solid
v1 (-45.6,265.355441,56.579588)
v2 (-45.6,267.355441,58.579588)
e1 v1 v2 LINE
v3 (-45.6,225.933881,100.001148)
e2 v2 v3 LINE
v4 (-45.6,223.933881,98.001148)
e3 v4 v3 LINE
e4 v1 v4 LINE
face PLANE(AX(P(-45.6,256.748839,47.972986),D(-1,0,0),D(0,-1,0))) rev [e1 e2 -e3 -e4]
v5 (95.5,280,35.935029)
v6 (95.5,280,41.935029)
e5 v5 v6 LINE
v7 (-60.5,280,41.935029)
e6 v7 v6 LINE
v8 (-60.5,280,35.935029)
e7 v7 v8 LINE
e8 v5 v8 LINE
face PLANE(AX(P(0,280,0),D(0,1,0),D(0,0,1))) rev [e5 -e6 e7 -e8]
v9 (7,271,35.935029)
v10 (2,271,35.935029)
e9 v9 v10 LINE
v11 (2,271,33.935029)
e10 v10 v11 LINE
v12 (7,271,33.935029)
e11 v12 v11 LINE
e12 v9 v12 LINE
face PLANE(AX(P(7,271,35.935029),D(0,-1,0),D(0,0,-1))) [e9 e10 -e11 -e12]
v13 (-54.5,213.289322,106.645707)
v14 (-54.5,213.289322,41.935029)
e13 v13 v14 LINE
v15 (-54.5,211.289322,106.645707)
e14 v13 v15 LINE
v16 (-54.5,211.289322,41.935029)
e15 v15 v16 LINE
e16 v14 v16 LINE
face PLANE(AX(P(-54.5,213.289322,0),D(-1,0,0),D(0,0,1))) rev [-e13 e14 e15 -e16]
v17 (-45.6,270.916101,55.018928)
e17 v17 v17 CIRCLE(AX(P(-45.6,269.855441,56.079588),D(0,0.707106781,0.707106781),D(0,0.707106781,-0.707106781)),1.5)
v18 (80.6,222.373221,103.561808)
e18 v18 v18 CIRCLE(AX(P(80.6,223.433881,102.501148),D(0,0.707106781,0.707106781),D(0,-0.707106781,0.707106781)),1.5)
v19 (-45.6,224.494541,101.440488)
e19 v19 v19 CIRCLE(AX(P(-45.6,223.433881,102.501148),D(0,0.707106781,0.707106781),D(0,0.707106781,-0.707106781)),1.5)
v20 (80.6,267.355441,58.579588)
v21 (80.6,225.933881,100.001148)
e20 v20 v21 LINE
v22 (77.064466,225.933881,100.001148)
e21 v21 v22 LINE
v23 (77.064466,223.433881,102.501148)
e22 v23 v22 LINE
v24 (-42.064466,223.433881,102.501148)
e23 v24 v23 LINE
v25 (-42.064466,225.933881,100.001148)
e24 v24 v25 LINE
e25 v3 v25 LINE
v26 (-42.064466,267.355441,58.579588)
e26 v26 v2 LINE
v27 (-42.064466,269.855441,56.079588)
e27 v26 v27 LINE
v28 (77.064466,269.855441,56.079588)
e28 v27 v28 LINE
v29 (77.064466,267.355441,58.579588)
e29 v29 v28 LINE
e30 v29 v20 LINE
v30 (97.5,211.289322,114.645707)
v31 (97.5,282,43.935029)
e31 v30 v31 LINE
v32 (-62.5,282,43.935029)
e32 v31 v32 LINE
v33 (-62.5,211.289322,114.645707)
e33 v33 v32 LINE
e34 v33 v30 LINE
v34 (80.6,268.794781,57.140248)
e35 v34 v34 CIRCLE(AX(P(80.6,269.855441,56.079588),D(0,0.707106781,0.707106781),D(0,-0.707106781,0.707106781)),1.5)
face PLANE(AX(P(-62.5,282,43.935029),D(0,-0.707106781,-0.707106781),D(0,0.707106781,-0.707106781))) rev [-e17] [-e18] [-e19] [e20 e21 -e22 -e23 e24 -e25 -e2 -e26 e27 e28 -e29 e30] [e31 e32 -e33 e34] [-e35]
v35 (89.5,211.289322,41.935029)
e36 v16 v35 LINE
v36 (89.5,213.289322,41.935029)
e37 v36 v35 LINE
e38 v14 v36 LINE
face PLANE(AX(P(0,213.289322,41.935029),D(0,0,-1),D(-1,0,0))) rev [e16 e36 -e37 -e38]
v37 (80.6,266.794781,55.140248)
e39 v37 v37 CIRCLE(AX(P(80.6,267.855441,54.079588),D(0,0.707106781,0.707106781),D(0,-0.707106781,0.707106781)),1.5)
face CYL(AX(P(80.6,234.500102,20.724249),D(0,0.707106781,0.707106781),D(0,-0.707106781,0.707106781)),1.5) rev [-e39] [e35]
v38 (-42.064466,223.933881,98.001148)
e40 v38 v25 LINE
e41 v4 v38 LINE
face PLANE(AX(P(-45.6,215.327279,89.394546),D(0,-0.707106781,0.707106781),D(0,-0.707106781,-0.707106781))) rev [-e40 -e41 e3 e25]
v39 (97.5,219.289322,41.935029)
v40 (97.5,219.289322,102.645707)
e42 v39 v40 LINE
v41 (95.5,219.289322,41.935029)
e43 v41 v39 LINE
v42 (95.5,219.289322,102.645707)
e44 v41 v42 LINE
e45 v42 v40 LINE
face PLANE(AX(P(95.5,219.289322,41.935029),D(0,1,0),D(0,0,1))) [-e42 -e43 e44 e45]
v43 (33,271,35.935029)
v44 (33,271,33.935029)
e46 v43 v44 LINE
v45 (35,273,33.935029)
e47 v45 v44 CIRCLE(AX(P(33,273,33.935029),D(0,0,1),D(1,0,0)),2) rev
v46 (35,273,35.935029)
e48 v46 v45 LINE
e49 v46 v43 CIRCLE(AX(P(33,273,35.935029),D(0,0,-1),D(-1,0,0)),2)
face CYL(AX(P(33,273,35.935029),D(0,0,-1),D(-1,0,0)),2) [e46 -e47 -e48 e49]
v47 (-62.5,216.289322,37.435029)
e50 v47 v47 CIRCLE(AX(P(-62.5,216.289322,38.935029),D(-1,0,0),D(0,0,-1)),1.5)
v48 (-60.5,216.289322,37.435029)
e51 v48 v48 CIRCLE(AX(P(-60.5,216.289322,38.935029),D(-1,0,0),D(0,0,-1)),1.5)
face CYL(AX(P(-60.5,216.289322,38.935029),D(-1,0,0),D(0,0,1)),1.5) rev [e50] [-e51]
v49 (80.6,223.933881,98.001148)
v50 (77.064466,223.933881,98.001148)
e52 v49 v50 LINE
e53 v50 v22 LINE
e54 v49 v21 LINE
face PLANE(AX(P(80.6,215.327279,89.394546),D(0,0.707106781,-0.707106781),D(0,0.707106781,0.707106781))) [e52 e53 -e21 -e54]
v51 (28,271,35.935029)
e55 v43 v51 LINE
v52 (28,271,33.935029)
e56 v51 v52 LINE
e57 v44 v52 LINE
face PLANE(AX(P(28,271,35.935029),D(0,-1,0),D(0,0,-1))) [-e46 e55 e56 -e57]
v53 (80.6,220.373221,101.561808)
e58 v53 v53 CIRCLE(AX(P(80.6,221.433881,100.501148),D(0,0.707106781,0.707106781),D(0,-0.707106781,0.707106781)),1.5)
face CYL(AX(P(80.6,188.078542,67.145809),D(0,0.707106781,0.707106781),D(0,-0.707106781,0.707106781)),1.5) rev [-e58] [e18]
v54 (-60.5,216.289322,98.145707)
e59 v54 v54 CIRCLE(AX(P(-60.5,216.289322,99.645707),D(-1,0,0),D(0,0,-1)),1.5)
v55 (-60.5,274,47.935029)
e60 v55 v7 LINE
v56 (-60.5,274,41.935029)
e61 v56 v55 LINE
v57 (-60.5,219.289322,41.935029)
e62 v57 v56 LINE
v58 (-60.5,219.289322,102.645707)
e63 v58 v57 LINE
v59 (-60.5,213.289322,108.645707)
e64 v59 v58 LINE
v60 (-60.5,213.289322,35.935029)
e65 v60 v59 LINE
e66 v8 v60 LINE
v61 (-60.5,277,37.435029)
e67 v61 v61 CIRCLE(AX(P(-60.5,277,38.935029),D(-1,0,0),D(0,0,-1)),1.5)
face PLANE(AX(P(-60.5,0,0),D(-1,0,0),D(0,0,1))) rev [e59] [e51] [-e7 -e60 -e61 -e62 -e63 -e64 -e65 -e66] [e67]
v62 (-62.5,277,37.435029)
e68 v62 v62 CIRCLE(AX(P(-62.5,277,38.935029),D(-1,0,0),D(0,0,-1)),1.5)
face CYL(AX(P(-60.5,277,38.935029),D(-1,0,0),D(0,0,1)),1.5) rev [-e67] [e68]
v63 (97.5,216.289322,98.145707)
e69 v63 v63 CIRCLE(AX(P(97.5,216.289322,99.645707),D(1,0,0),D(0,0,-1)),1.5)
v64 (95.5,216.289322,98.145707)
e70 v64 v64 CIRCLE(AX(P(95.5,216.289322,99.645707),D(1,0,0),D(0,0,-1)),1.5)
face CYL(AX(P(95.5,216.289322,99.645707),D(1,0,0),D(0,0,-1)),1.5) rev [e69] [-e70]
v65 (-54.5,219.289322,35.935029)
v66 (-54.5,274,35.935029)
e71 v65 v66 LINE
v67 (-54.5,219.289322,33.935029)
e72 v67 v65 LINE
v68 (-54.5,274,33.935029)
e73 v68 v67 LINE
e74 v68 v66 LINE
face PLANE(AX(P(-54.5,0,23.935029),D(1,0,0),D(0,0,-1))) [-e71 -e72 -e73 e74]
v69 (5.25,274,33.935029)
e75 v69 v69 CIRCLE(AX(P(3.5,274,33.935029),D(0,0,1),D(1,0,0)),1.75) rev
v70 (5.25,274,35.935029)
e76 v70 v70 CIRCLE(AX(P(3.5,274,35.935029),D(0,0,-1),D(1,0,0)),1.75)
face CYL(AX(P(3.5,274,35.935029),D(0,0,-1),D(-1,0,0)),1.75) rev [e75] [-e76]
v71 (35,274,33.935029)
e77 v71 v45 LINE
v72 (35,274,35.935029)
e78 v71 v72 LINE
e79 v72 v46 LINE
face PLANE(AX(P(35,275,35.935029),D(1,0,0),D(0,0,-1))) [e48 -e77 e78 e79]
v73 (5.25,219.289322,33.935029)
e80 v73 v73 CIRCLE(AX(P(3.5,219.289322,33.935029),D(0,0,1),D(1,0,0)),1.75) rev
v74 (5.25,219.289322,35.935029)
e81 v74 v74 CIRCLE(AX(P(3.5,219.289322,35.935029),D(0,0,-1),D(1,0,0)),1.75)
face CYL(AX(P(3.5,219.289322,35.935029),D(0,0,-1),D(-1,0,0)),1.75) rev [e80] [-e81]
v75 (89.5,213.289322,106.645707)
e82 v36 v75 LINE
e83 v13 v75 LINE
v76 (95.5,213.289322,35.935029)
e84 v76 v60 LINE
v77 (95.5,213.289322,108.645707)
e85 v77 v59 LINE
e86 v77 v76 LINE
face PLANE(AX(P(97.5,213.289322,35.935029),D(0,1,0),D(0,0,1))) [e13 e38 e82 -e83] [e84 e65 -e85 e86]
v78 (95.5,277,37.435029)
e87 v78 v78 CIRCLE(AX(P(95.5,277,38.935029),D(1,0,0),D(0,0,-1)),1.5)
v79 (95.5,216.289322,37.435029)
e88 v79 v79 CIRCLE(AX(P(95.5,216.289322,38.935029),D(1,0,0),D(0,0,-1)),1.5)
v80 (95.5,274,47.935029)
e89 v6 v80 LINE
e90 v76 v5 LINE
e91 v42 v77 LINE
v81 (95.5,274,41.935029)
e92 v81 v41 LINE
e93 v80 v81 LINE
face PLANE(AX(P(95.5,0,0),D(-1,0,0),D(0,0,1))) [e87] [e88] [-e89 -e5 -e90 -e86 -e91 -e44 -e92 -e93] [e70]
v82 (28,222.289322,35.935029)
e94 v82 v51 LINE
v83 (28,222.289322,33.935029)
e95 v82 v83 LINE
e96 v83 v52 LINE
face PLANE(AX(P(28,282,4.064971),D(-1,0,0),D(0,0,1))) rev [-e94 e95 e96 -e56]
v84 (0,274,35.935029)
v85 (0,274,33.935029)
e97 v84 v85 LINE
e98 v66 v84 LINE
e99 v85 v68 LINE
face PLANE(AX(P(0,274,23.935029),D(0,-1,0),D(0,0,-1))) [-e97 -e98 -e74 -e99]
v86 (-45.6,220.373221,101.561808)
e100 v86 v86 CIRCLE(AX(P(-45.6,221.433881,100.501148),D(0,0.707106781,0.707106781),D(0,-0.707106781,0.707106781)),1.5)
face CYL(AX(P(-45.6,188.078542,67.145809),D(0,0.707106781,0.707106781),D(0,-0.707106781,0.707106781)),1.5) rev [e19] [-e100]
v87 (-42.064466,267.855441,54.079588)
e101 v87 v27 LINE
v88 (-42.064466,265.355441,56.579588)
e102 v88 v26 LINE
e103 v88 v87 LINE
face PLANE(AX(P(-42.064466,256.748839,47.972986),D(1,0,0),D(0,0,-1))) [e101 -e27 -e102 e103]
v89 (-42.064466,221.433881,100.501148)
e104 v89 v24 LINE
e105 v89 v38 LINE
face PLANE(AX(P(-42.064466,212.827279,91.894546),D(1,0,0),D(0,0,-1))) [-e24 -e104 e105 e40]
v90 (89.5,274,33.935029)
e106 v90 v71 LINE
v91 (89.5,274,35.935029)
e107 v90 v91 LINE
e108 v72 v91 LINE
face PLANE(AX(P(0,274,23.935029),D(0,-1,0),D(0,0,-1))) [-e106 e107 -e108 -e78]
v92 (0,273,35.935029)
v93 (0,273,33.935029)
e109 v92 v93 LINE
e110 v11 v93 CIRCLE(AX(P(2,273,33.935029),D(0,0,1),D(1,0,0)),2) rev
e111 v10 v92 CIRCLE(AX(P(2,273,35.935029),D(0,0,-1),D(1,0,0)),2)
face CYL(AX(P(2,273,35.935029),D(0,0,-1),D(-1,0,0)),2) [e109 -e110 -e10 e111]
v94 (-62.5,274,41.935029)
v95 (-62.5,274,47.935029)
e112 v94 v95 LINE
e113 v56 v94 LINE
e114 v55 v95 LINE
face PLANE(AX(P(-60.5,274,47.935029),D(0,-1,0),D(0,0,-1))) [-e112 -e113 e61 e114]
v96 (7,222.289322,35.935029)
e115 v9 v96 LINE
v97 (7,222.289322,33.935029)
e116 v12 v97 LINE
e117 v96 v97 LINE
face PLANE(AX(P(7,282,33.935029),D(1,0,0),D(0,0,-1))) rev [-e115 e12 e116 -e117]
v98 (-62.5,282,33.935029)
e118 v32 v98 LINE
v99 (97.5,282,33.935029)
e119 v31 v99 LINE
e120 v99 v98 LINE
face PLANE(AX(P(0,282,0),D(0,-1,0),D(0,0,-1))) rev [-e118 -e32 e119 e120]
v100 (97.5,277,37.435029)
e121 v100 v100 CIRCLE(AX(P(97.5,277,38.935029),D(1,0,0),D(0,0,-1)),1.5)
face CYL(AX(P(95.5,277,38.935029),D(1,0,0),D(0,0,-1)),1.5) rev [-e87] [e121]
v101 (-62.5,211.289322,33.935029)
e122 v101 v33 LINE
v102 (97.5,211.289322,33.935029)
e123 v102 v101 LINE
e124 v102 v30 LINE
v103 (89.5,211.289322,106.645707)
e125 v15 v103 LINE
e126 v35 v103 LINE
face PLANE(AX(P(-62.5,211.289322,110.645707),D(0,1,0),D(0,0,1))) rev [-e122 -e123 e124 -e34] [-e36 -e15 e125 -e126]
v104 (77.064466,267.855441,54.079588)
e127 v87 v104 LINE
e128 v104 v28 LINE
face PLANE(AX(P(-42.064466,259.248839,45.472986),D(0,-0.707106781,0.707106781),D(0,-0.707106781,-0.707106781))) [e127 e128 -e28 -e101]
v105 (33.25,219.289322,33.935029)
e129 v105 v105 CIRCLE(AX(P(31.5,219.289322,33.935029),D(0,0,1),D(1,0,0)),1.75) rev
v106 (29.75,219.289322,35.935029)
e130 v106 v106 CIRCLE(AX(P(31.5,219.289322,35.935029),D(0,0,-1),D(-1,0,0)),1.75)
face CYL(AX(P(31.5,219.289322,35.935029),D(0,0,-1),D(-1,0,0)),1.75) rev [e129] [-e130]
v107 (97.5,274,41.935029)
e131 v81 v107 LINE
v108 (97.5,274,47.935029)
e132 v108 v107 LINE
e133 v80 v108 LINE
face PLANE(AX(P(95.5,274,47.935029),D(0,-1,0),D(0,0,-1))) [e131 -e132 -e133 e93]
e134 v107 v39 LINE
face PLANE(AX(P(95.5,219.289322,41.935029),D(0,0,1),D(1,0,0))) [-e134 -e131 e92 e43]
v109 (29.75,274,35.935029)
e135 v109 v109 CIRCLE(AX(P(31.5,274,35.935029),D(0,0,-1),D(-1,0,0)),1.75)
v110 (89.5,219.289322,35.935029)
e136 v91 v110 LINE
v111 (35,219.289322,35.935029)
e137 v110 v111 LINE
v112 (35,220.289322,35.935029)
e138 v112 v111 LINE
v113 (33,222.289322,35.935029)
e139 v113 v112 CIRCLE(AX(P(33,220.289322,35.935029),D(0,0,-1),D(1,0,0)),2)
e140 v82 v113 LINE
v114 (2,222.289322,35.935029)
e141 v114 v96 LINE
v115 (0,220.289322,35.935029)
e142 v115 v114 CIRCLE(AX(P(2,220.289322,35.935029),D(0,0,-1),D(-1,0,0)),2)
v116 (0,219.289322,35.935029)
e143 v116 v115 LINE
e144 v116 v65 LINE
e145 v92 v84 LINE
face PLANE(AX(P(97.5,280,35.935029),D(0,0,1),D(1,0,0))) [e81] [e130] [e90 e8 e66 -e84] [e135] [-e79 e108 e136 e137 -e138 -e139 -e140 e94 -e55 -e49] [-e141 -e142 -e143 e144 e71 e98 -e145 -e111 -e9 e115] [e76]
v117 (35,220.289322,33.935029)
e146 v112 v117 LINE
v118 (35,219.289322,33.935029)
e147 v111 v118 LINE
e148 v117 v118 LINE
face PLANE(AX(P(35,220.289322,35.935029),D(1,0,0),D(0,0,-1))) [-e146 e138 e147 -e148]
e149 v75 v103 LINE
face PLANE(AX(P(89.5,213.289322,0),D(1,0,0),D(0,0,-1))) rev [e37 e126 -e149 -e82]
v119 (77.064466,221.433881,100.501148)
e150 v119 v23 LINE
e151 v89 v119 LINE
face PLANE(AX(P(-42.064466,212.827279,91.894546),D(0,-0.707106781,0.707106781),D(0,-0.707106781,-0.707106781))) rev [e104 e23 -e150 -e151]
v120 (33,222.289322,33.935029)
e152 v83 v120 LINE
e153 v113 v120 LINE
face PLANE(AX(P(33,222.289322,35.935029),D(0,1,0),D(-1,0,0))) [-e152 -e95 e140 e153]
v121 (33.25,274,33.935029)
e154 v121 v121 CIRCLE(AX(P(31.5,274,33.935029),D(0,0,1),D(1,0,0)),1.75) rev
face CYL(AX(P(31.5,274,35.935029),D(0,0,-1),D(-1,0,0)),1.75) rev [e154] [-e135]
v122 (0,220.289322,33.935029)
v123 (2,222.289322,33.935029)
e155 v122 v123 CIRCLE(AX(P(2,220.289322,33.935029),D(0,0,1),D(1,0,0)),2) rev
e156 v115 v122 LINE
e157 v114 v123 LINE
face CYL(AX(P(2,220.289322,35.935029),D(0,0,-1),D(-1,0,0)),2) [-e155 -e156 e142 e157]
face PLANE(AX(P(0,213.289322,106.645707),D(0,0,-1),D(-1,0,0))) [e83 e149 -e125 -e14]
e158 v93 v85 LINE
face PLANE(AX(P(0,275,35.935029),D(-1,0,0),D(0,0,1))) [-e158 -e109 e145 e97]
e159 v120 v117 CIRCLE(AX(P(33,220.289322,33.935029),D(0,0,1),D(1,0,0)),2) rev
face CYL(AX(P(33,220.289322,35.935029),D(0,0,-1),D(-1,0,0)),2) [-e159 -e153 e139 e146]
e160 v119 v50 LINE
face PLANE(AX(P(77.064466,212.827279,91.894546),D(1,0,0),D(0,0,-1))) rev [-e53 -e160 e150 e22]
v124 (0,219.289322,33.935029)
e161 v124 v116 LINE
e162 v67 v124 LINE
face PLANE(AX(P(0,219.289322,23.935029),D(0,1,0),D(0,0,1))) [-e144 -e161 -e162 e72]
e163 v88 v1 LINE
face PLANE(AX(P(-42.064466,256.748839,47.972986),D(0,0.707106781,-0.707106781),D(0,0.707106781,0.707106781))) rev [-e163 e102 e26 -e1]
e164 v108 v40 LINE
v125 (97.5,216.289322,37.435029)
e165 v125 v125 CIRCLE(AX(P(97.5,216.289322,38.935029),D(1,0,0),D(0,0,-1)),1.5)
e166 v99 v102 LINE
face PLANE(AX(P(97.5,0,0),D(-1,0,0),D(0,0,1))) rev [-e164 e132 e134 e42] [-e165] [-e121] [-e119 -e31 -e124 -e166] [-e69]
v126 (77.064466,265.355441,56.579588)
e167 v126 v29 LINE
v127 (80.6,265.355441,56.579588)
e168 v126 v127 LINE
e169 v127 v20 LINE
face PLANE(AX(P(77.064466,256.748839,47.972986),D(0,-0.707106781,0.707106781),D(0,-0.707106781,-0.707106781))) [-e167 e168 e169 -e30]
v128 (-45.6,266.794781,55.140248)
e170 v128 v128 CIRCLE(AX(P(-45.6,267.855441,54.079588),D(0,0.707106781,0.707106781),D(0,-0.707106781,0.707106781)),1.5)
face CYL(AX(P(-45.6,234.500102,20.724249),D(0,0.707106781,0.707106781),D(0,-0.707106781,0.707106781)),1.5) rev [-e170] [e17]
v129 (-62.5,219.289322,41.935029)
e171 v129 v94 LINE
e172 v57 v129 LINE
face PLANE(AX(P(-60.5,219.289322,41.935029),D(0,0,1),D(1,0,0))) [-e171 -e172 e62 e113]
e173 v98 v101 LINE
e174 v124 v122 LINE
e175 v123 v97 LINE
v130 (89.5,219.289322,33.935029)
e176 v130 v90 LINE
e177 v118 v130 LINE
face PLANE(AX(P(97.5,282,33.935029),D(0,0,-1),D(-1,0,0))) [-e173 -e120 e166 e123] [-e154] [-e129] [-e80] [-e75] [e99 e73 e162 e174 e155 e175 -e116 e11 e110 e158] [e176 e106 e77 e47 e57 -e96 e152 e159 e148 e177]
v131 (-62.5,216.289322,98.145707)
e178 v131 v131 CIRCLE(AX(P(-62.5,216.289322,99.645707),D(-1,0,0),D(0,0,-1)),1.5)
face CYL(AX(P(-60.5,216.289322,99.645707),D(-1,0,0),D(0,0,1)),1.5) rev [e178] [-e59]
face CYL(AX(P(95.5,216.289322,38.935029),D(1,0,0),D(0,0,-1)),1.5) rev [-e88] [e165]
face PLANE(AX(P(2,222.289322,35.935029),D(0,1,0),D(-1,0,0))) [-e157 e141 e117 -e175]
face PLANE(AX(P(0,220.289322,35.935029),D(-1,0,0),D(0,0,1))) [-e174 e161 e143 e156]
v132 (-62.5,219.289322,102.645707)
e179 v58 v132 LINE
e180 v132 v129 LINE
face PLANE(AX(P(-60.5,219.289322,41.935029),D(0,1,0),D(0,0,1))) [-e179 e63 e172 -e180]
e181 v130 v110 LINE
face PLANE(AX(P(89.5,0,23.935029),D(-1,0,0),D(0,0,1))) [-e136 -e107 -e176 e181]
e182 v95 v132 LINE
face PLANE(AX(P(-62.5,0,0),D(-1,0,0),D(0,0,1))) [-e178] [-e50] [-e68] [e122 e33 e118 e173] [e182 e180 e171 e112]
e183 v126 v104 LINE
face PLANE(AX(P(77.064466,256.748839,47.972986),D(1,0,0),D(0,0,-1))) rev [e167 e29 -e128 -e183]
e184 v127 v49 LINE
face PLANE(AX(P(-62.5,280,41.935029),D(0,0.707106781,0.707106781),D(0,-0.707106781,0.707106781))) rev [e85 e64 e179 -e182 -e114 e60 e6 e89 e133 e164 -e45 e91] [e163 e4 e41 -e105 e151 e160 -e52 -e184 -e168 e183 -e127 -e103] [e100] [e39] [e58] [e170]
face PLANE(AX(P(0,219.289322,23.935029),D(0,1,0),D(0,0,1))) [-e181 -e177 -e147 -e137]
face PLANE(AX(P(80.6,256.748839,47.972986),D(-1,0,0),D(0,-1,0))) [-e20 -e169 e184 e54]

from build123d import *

# Parameters (mm, degrees)
ESQUISSE1_W                  = 35
ESQUISSE1_H                  = 35
BOSS_EXTRU_1_DEPTH           = 2
ESQUISSE2_R                  = 1.75
ESQUISSE2_W                  = 35
ESQUISSE2_H                  = 1.064971157
ENL_V_MAT_EXTRU_1_DEPTH      = 2
BOSS_EXTRU_2_DEPTH           = 280
ESQUISSE5_W                  = 7
ESQUISSE5_H                  = 6
ESQUISSE5_R                  = 1.75
BOSS_EXTRU_3_DEPTH           = 2
ESQUISSE6_R                  = 1.75
BOSS_EXTRU_4_DEPTH           = 2
ESQUISSE10_W                 = 35
ESQUISSE10_H                 = 33.935028843
ESQUISSE10_R                 = 1.75
BOSS_EXTRU_5_DEPTH           = 2
ESQUISSE15_R                 = 6.5
ESQUISSE15_R_2               = 1.75
ENL_V_MAT_EXTRU_2_DEPTH      = 373
CONG_1_R                     = 2
CONG_2_R                     = 4
EXTRU_MINCE1_START           = -2
EXTRU_MINCE1_OUTLINE_W       = 35
EXTRU_MINCE1_OUTLINE_H       = 10
EXTRU_MINCE1_DEPTH           = 2
BOSS_EXTRU_7_DEPTH           = 62.5
BOSS_EXTRU_8_DEPTH           = 160
ENL_V_MAT_EXTRU_4_DEPTH      = 15
BOSS_EXTRU_31_DEPTH          = 69.5
BOSS_EXTRU_31_DEPTH_BACK     = 90.5
ESQUISSE29_W                 = 0.210775501
ESQUISSE29_H                 = 2
BOSS_EXTRU_32_DEPTH          = 160
ENL_V_MAT_EXTRU_7_DEPTH      = 10
ENL_V_MAT_EXTRU_7_DEPTH_BACK = 5
ESQUISSE34_W                 = 144
ESQUISSE34_H                 = 64.710678118
ENL_V_MAT_EXTRU_8_DEPTH      = 2
ESQUISSE35_R                 = 1.5
BOSS_EXTRU_35_DEPTH          = 2
BOSS_EXTRU_36_START          = -2
ESQUISSE36_R                 = 1.5
BOSS_EXTRU_36_DEPTH          = 2
BOSS_EXTRU_37_DEPTH          = 21
BOSS_EXTRU_38_DEPTH          = 28
ESQUISSE42_W                 = 17
ESQUISSE42_H                 = 6
ENL_V_MAT_EXTRU_9_DEPTH      = 124
ESQUISSE43_R                 = 1.1
ENL_V_MAT_EXTRU_11_DEPTH     = 50
ESQUISSE45_R                 = 1.5
ENL_V_MAT_EXTRU_12_DEPTH     = 50
ESQUISSE47_R                 = 1.75
BOSS_EXTRU_40_DEPTH          = 2
ENL_V_MAT_EXTRU_13_DEPTH     = 2
ESQUISSE49_R                 = 1.75
BOSS_EXTRU_41_DEPTH          = 2
ESQUISSE50_W                 = 12.927363302
ESQUISSE50_H                 = 18
ENL_V_MAT_EXTRU_14_DEPTH     = 2
ESQUISSE51_R                 = 1.75
BOSS_EXTRU_42_DEPTH          = 2
BOSS_EXTRU_43_DEPTH          = 2
BOSS_EXTRU_43_DEPTH_BACK     = 2
ESQUISSE53_R                 = 1.75
ENL_V_START                  = -2
ESQUISSE54_R                 = 1.75
ENL_V_MAT_EXTRU_15_DEPTH     = 2
BOSS_EXTRU_44_DEPTH          = 2
BOSS_EXTRU_44_DEPTH_BACK     = 2
ESQUISSE55_R                 = 1.75
ENL_V_MAT_EXTRU_18_DEPTH     = 347
ENL_V_MAT_EXTRU_19_DEPTH     = 347
ESQUISSE62_W                 = 8
ESQUISSE62_H                 = 1.374343966
BOSS_EXTRU_45_DEPTH          = 134


# Read off the part's stored shape, not the designer's step: Extru.-Mince1
with BuildPart() as part:
    # Esquisse1 → Boss.-Extru.1 (new body)
    with BuildSketch(Plane(origin=(0, 0, 0), x_dir=(1, 0, 0), z_dir=(0, 1, 0))):
        with Locations((17.5, -17.5)):
            Rectangle(ESQUISSE1_W, ESQUISSE1_H)
    extrude(amount=BOSS_EXTRU_1_DEPTH)

    # Esquisse2 → Enlèv. mat.-Extru.1 (cut)
    with BuildSketch(Plane(origin=(0, 2, 0), x_dir=(1, 0, 0), z_dir=(0, 1, 0))):
        with Locations(Location((30.935029054, -4.064971369, 0), (0, 0, 270))):
            Circle(ESQUISSE2_R)
        with Locations(Location((30.935028843, -30.935028843, 0), (0, 0, 270))):
            Circle(ESQUISSE2_R)
        with Locations(Location((4.064971369, -4.064970946, 0), (0, 0, 270))):
            Circle(ESQUISSE2_R)
        with Locations(Location((4.064971157, -30.935028843, 0), (0, 0, 270))):
            Circle(ESQUISSE2_R)
        with Locations((17.5, -34.467514421)):
            Rectangle(ESQUISSE2_W, ESQUISSE2_H)
    extrude(amount=-ENL_V_MAT_EXTRU_1_DEPTH, mode=Mode.SUBTRACT)

    # Esquisse4 → Boss.-Extru.2 (add)
    with BuildSketch(Plane(origin=(0, 2, 0), x_dir=(1, 0, 0), z_dir=(0, 1, 0))):
        Polygon((17.5, -33.935028843), (7, -33.935028843), (7, -4.064970946), (28, -4.064970946), (28, -33.935028843), align=None)
    extrude(amount=BOSS_EXTRU_2_DEPTH)

    # Esquisse5 → Boss.-Extru.3 (add)
    # profile 1 of 4: a face of its own
    with BuildSketch(Plane.XY.offset(33.935028843)):
        with Locations((31.5, 254)):
            Rectangle(ESQUISSE5_W, ESQUISSE5_H)
        with Locations((31.5, 254)):
            Circle(ESQUISSE5_R, mode=Mode.SUBTRACT)
    # profile 2 of 4: a face of its own
    with BuildSketch(Plane.XY.offset(33.935028843)):
        with Locations((3.5, 254)):
            Rectangle(ESQUISSE5_W, ESQUISSE5_H)
        with Locations((3.5, 254)):
            Circle(ESQUISSE5_R, mode=Mode.SUBTRACT)
    # profile 3 of 4: a face of its own
    with BuildSketch(Plane.XY.offset(33.935028843)):
        with Locations((31.5, 28)):
            Rectangle(ESQUISSE5_W, ESQUISSE5_H)
        with Locations((31.5, 28)):
            Circle(ESQUISSE5_R, mode=Mode.SUBTRACT)
    # profile 4 of 4: a face of its own
    with BuildSketch(Plane.XY.offset(33.935028843)):
        with Locations((3.5, 28)):
            Rectangle(ESQUISSE5_W, ESQUISSE5_H)
        with Locations((3.5, 28)):
            Circle(ESQUISSE5_R, mode=Mode.SUBTRACT)
    extrude(amount=-BOSS_EXTRU_3_DEPTH)

    # Esquisse6 → Boss.-Extru.4 (add)
    # profile 1 of 2: a face of its own
    with BuildSketch(Plane.XY.offset(33.935028843)):
        Polygon((7, 144), (0, 144), (0, 141), (0, 138), (7, 138), (7, 141), align=None)
        with Locations((3.5, 141)):
            Circle(ESQUISSE6_R, mode=Mode.SUBTRACT)
    # profile 2 of 2: a face of its own
    with BuildSketch(Plane.XY.offset(33.935028843)):
        Polygon((35, 144), (28, 144), (28, 141), (28, 138), (35, 138), (35, 141), align=None)
        with Locations((31.5, 141)):
            Circle(ESQUISSE6_R, mode=Mode.SUBTRACT)
    extrude(amount=-BOSS_EXTRU_4_DEPTH)

    # Esquisse10 → Boss.-Extru.5 (add)
    with BuildSketch(Plane(origin=(0, 282, 0), x_dir=(1, 0, 0), z_dir=(0, 1, 0))):
        with Locations((17.5, -16.967514422)):
            Rectangle(ESQUISSE10_W, ESQUISSE10_H)
        with Locations(Location((30.935028843, -30.935028843, 0), (0, 0, 270))):
            Circle(ESQUISSE10_R, mode=Mode.SUBTRACT)
        with Locations(Location((30.935028631, -4.064970946, 0), (0, 0, 270.000013863))):
            Circle(ESQUISSE10_R, mode=Mode.SUBTRACT)
        with Locations(Location((4.064970946, -4.064971369, 0), (0, 0, 270.000013863))):
            Circle(ESQUISSE10_R, mode=Mode.SUBTRACT)
        with Locations(Location((4.064971157, -30.935028843, 0), (0, 0, 270))):
            Circle(ESQUISSE10_R, mode=Mode.SUBTRACT)
    extrude(amount=-BOSS_EXTRU_5_DEPTH)

    # Esquisse15 → Enlèv. mat.-Extru.2 (cut)
    with BuildSketch(Plane(origin=(0, 282, 0), x_dir=(1, 0, 0), z_dir=(0, 1, 0))):
        with Locations(Location((17.5, -17.5, 0), (0, 0, 270))):
            Circle(ESQUISSE15_R)
        with Locations(Location((30.935029054, -4.064971369, 0), (0, 0, 270))):
            Circle(ESQUISSE15_R_2)
    extrude(amount=-ENL_V_MAT_EXTRU_2_DEPTH, mode=Mode.SUBTRACT)

    # Congé1
    cong_1_edges = [part.edges().sort_by_distance(p)[0] for p in [
        (0, 31, 32.935028843),
        (0, 25, 32.935028843),
        (0, 144, 32.935028843),
        (0, 138, 32.935028843),
        (35, 144, 32.935028843),
        (35, 138, 32.935028843),
        (35, 257, 32.935028843),
        (35, 251, 32.935028843),
        (0, 251, 32.935028843),
        (0, 257, 32.935028843),
        (35, 31, 32.935028843),
        (35, 25, 32.935028843),
    ]]
    fillet(cong_1_edges, radius=CONG_1_R)

    # Congé2
    cong_2_edges = [part.edges().sort_by_distance(p)[0] for p in [
        (35, 281, 0),
        (0, 281, 0),
        (0, 1, 0),
        (35, 1, 0),
    ]]
    fillet(cong_2_edges, radius=CONG_2_R)

    # Extru.-Mince1 outline → Extru.-Mince1 (add)
    with BuildSketch(Plane(origin=(0, 282, 0), x_dir=(1, 0, 0), z_dir=(0, 1, 0)).offset(EXTRU_MINCE1_START)):
        with Locations((17.5, -38.935028843)):
            Rectangle(EXTRU_MINCE1_OUTLINE_W, EXTRU_MINCE1_OUTLINE_H)
    extrude(amount=EXTRU_MINCE1_DEPTH)

    # Esquisse20 → Boss.-Extru.7 (add)
    with BuildSketch(Plane.ZY):
        Polygon((43.935028843, 282), (114.645706961, 211.289321881), (110.645706961, 211.289321881), (41.935028843, 280), (34.145804344, 280), (34.145804344, 282), align=None)
    extrude(amount=BOSS_EXTRU_7_DEPTH)

    # Esquisse21 → Boss.-Extru.8 (add)
    with BuildSketch(Plane.ZY.offset(62.5)):
        Polygon((34.145804344, 280), (41.935028843, 280), (110.645706961, 211.289321881), (114.645706961, 211.289321881), (43.935028843, 282), (34.145804344, 282), align=None)
    extrude(amount=-BOSS_EXTRU_8_DEPTH)

    # Esquisse22 → Enlèv. mat.-Extru.4 (cut)
    with BuildSketch(Plane(origin=(0, 162.967514421, 162.967514421), x_dir=(1, 0, 0), z_dir=(0, 0.7071067811865462, 0.7071067811865488))):
        Polygon((-42.064466094, 147.626821562), (-45.6, 147.626821562), (-45.6, 89.047889374), (-42.064466094, 89.047889374), (-42.064466094, 85.512355468), (77.064466094, 85.512355468), (77.064466094, 89.047889374), (80.6, 89.047889374), (80.6, 147.626821562), (77.064466094, 147.626821562), (77.064466094, 151.162355468), (-42.064466094, 151.162355468), align=None)
    extrude(amount=-ENL_V_MAT_EXTRU_4_DEPTH, mode=Mode.SUBTRACT)

    # Esquisse29 → Boss.-Extru.31 (add, two sides: drawn at the far end of the back side and taken through both)
    with BuildSketch(Plane.ZY.offset(-7).offset(-BOSS_EXTRU_31_DEPTH_BACK)):
        with Locations((34.040416594, 281)):
            Rectangle(ESQUISSE29_W, ESQUISSE29_H)
    extrude(amount=BOSS_EXTRU_31_DEPTH + BOSS_EXTRU_31_DEPTH_BACK)

    # Esquisse32 → Boss.-Extru.32 (add)
    with BuildSketch(Plane.ZY.offset(62.5)):
        Polygon((110.645706961, 211.289321881), (33.935028843, 211.289321881), (33.935028843, 280), (35.935028843, 280), (35.935028843, 213.289321881), (108.645706961, 213.289321881), align=None)
    extrude(amount=-BOSS_EXTRU_32_DEPTH)

    # Esquisse33 → Enlèv. mat.-Extru.7 (cut, two sides: drawn at the far end of the back side and taken through both)
    with BuildSketch(Plane(origin=(0, 0, 33.935028843), x_dir=(-1, 0, 0), z_dir=(0, 0, -1)).offset(-ENL_V_MAT_EXTRU_7_DEPTH_BACK)):
        Polygon((-28, 274.000000001), (-89.5, 274.000000001), (-89.5, 219.289321881), (-81.5, 219.289321881), (-28, 219.289321881), align=None)
        with BuildLine():
            Line((54.5, 274.000000001), (-7, 274.000000001))
            Line((-7, 274.000000001), (-7, 257))
            Line((-7, 257), (-2, 257))
            ThreePointArc((-2, 257), (-0.585786438, 256.414213562), (0, 255))
            Line((0, 255), (0, 253))
            ThreePointArc((0, 253), (-0.585786438, 251.585786438), (-2, 251))
            Line((-2, 251), (-7, 251))
            Line((-7, 251), (-7, 219.289321881))
            Line((-7, 219.289321881), (1, 219.289321881))
            Line((1, 219.289321881), (54.5, 219.289321881))
            Line((54.5, 219.289321881), (54.5, 274.000000001))
        make_face()
        with BuildLine():
            Line((-2, 257), (-7, 257))
            Line((-7, 257), (-7, 251))
            Line((-7, 251), (-2, 251))
            ThreePointArc((-2, 251), (-0.585786438, 251.585786438), (0, 253))
            Line((0, 253), (0, 255))
            ThreePointArc((0, 255), (-0.585786438, 256.414213562), (-2, 257))
        make_face()
    extrude(amount=ENL_V_MAT_EXTRU_7_DEPTH + ENL_V_MAT_EXTRU_7_DEPTH_BACK, mode=Mode.SUBTRACT)

    # Esquisse34 → Enlèv. mat.-Extru.8 (cut)
    with BuildSketch(Plane.XZ.offset(-211.289321881)):
        with Locations((17.5, 74.290367902)):
            Rectangle(ESQUISSE34_W, ESQUISSE34_H)
    extrude(amount=-ENL_V_MAT_EXTRU_8_DEPTH, mode=Mode.SUBTRACT)

    # Esquisse35 → Boss.-Extru.35 (add)
    with BuildSketch(Plane(origin=(97.5, 0, 0), x_dir=(0, 0, -1), z_dir=(1, 0, 0))):
        Polygon((-35.935028843, 280), (-35.935028843, 274.000000001), (-35.935028843, 213.289321881), (-108.645706961, 213.289321881), (-102.645706961, 219.289321881), (-41.935028842, 219.289321881), (-41.935028842, 274.000000001), (-47.935028841, 274.000000001), (-41.935028843, 280), align=None)
        with Locations((-38.935028842, 216.289321881)):
            Circle(ESQUISSE35_R, mode=Mode.SUBTRACT)
        with Locations((-38.935028842, 277.000000001)):
            Circle(ESQUISSE35_R, mode=Mode.SUBTRACT)
        with Locations((-99.645706961, 216.289321881)):
            Circle(ESQUISSE35_R, mode=Mode.SUBTRACT)
    extrude(amount=-BOSS_EXTRU_35_DEPTH)

    # Esquisse36 → Boss.-Extru.36 (add)
    with BuildSketch(Plane.ZY.offset(62.5).offset(BOSS_EXTRU_36_START)):
        Polygon((35.935028843, 213.289321881), (108.645706961, 213.289321881), (102.645706961, 219.289321881), (41.935028842, 219.289321881), (41.935028842, 274.000000001), (47.935028841, 274.000000001), (41.935028843, 280), (35.935028843, 280), (35.935028843, 274.000000001), align=None)
        with Locations(Location((99.645706961, 216.289321881, 0), (0, 0, 180))):
            Circle(ESQUISSE36_R, mode=Mode.SUBTRACT)
        with Locations(Location((38.935028842, 277.000000001, 0), (0, 0, 180))):
            Circle(ESQUISSE36_R, mode=Mode.SUBTRACT)
        with Locations(Location((38.935028842, 216.289321881, 0), (0, 0, 180))):
            Circle(ESQUISSE36_R, mode=Mode.SUBTRACT)
    extrude(amount=BOSS_EXTRU_36_DEPTH)

    # Esquisse39 → Boss.-Extru.37 (add)
    with BuildSketch(Plane(origin=(28, 0, 0), x_dir=(0, 0, -1), z_dir=(1, 0, 0))):
        Polygon((-33.935028843, 211.289321881), (-33.935028843, 191.289321881), (-118.935028843, 201.289321881), (-118.935028843, 211.289321881), align=None)
    extrude(amount=-BOSS_EXTRU_37_DEPTH)

    # Esquisse40 → Boss.-Extru.38 (add)
    with BuildSketch(Plane.XY.offset(118.935028843)):
        Polygon((7, 201.289321881), (2, 201.289321881), (2, 203.289321881), (33, 203.289321881), (33, 201.289321881), (28, 201.289321881), align=None)
    extrude(amount=BOSS_EXTRU_38_DEPTH)

    # Esquisse42 → Enlèv. mat.-Extru.9 (cut)
    with BuildSketch(Plane.XY.offset(118.935028843)):
        with Locations((17.5, 208.289321881)):
            Rectangle(ESQUISSE42_W, ESQUISSE42_H)
    extrude(amount=-ENL_V_MAT_EXTRU_9_DEPTH, mode=Mode.SUBTRACT)

    # Esquisse43 → Enlèv. mat.-Extru.11 (cut)
    with BuildSketch(Plane(origin=(0, 203.289321881, 0), x_dir=(1, 0, 0), z_dir=(0, 1, 0))):
        with Locations(Location((5, -144.935028843, 0), (0, 0, 270))):
            Circle(ESQUISSE43_R)
        with Locations(Location((30, -144.935028843, 0), (0, 0, 270))):
            Circle(ESQUISSE43_R)
        with Locations(Location((5, -130.435028843, 0), (0, 0, 270))):
            Circle(ESQUISSE43_R)
        with Locations(Location((30, -130.435028843, 0), (0, 0, 270))):
            Circle(ESQUISSE43_R)
        with BuildLine():
            Line((5, -123.319506434), (5, -128.435028843))
            ThreePointArc((5, -128.435028843), (7, -130.435028843), (5, -132.435028843))
            Line((5, -132.435028843), (5, -142.935028843))
            ThreePointArc((5, -142.935028843), (6.414213562, -143.52081528), (7, -144.935028843))
            Line((7, -144.935028843), (28, -144.935028843))
            ThreePointArc((28, -144.935028843), (28.585786438, -143.52081528), (30, -142.935028843))
            Line((30, -142.935028843), (30, -132.435028843))
            ThreePointArc((30, -132.435028843), (28, -130.435028843), (30, -128.435028843))
            Line((30, -128.435028843), (30, -123.319506434))
            Line((30, -123.319506434), (5, -123.319506434))
        make_face()
    extrude(amount=-ENL_V_MAT_EXTRU_11_DEPTH, mode=Mode.SUBTRACT)

    # Esquisse45 → Enlèv. mat.-Extru.12 (cut)
    with BuildSketch(Plane(origin=(0, 162.967514421, 162.967514421), x_dir=(1, 0, 0), z_dir=(0, 0.7071067811865462, 0.7071067811865488))):
        with Locations(Location((80.6, 151.162355468, 0), (0, 0, 270))):
            Circle(ESQUISSE45_R)
        with Locations(Location((80.6, 85.512355468, 0), (0, 0, 270))):
            Circle(ESQUISSE45_R)
        with Locations(Location((-45.6, 85.512355468, 0), (0, 0, 270))):
            Circle(ESQUISSE45_R)
        with Locations(Location((-45.6, 151.162355468, 0), (0, 0, 270))):
            Circle(ESQUISSE45_R)
    extrude(amount=-ENL_V_MAT_EXTRU_12_DEPTH, mode=Mode.SUBTRACT)

    # Esquisse47 → Boss.-Extru.40 (add)
    # profile 1 of 4: a face of its own
    with BuildSketch(Plane.XY.offset(33.935028843)):
        with BuildLine():
            Line((2, 144), (7, 144))
            Line((7, 144), (7, 150))
            Line((7, 150), (2, 150))
            ThreePointArc((2, 150), (0.585786438, 149.414213562), (0, 148))
            Line((0, 148), (0, 146))
            ThreePointArc((0, 146), (0.585786438, 144.585786438), (2, 144))
        make_face()
        with Locations((3.5, 147)):
            Circle(ESQUISSE47_R, mode=Mode.SUBTRACT)
    # profile 2 of 4: a face of its own
    with BuildSketch(Plane.XY.offset(33.935028843)):
        with BuildLine():
            Line((28, 150), (28, 144))
            Line((28, 144), (33, 144))
            ThreePointArc((33, 144), (34.414213562, 144.585786438), (35, 146))
            Line((35, 146), (35, 148))
            ThreePointArc((35, 148), (34.414213562, 149.414213562), (33, 150))
            Line((33, 150), (28, 150))
        make_face()
        with Locations((31.5, 147)):
            Circle(ESQUISSE47_R, mode=Mode.SUBTRACT)
    # profile 3 of 4: a face of its own
    with BuildSketch(Plane.XY.offset(33.935028843)):
        with BuildLine():
            Line((35, 134), (35, 136))
            ThreePointArc((35, 136), (34.414213562, 137.414213562), (33, 138))
            Line((33, 138), (28, 138))
            Line((28, 138), (28, 132))
            Line((28, 132), (33, 132))
            ThreePointArc((33, 132), (34.414213562, 132.585786438), (35, 134))
        make_face()
        with Locations((31.5, 135)):
            Circle(ESQUISSE47_R, mode=Mode.SUBTRACT)
    # profile 4 of 4: a face of its own
    with BuildSketch(Plane.XY.offset(33.935028843)):
        with BuildLine():
            Line((7, 138), (2, 138))
            ThreePointArc((2, 138), (0.585786438, 137.414213562), (0, 136))
            Line((0, 136), (0, 134))
            ThreePointArc((0, 134), (0.585786438, 132.585786438), (2, 132))
            Line((2, 132), (7, 132))
            Line((7, 132), (7, 138))
        make_face()
        with Locations((3.5, 135)):
            Circle(ESQUISSE47_R, mode=Mode.SUBTRACT)
    extrude(amount=-BOSS_EXTRU_40_DEPTH)

    # Esquisse48 → Enlèv. mat.-Extru.13 (cut)
    with BuildSketch(Plane.XY.offset(33.935028843)):
        Polygon((-4.556540033, 144), (-4.556540033, 138), (2, 138), (7, 138), (7, 144), (2, 144), align=None)
        Polygon((33.295178048, 144), (39.851718081, 144), (39.851718081, 138), (33.295178048, 138), (28.295178048, 138), (28.295178048, 144), align=None)
    extrude(amount=-ENL_V_MAT_EXTRU_13_DEPTH, mode=Mode.SUBTRACT)

    # Esquisse49 → Boss.-Extru.41 (add)
    # profile 1 of 2: a face of its own
    with BuildSketch(Plane.XY.offset(33.935028843)):
        with BuildLine():
            Line((2, 180.289321881), (7, 180.289321881))
            Line((7, 180.289321881), (7, 186.289321881))
            Line((7, 186.289321881), (2, 186.289321881))
            ThreePointArc((2, 186.289321881), (0.585786438, 185.703535444), (0, 184.289321881))
            Line((0, 184.289321881), (0, 182.289321881))
            ThreePointArc((0, 182.289321881), (0.585786438, 180.875108319), (2, 180.289321881))
        make_face()
        with Locations((3.5, 183.289321881)):
            Circle(ESQUISSE49_R, mode=Mode.SUBTRACT)
    # profile 2 of 2: a face of its own
    with BuildSketch(Plane.XY.offset(33.935028843)):
        with BuildLine():
            Line((35, 182.289321881), (35, 184.289321881))
            ThreePointArc((35, 184.289321881), (34.414213562, 185.703535444), (33, 186.289321881))
            Line((33, 186.289321881), (28, 186.289321881))
            Line((28, 186.289321881), (28, 180.289321881))
            Line((28, 180.289321881), (33, 180.289321881))
            ThreePointArc((33, 180.289321881), (34.414213562, 180.875108319), (35, 182.289321881))
        make_face()
        with Locations((31.5, 183.289321881)):
            Circle(ESQUISSE49_R, mode=Mode.SUBTRACT)
    extrude(amount=-BOSS_EXTRU_41_DEPTH)

    # Esquisse50 → Enlèv. mat.-Extru.14 (cut)
    with BuildSketch(Plane.XY.offset(33.935028843)):
        with Locations((34.463681651, 141)):
            Rectangle(ESQUISSE50_W, ESQUISSE50_H)
    extrude(amount=-ENL_V_MAT_EXTRU_14_DEPTH, mode=Mode.SUBTRACT)

    # Esquisse51 → Boss.-Extru.42 (add)
    # profile 1 of 3: a face of its own
    with BuildSketch(Plane.XY.offset(33.935028843)):
        with BuildLine():
            Line((7, 150), (7, 144))
            Line((7, 144), (2, 144))
            ThreePointArc((2, 144), (0.585786438, 144.585786438), (0, 146))
            Line((0, 146), (0, 148))
            ThreePointArc((0, 148), (0.585786438, 149.414213562), (2, 150))
            Line((2, 150), (7, 150))
        make_face()
        with Locations((3.5, 147)):
            Circle(ESQUISSE51_R, mode=Mode.SUBTRACT)
    # profile 2 of 3: a face of its own
    with BuildSketch(Plane.XY.offset(33.935028843)):
        with BuildLine():
            Line((33, 138.018442997), (28, 138.018442997))
            Line((28, 138.018442997), (28, 132.018442997))
            Line((28, 132.018442997), (33, 132.018442997))
            ThreePointArc((33, 132.018442997), (34.414213562, 132.604229434), (35, 134.018442997))
            Line((35, 134.018442997), (35, 136.018442997))
            ThreePointArc((35, 136.018442997), (34.414213562, 137.432656559), (33, 138.018442997))
        make_face()
        with Locations((31.5, 135.018442997)):
            Circle(ESQUISSE51_R, mode=Mode.SUBTRACT)
    # profile 3 of 3: a face of its own
    with BuildSketch(Plane.XY.offset(33.935028843)):
        with BuildLine():
            Line((33, 150), (28, 150))
            Line((28, 150), (28, 144))
            Line((28, 144), (33, 144))
            ThreePointArc((33, 144), (34.414213562, 144.585786438), (35, 146))
            Line((35, 146), (35, 148))
            ThreePointArc((35, 148), (34.414213562, 149.414213562), (33, 150))
        make_face()
        with Locations((31.5, 147)):
            Circle(ESQUISSE51_R, mode=Mode.SUBTRACT)
    extrude(amount=-BOSS_EXTRU_42_DEPTH)

    # Esquisse53 → Boss.-Extru.43 (add, two sides: drawn at the far end of the back side and taken through both)
    # profile 1 of 4: a face of its own
    with BuildSketch(Plane(origin=(0, 0, 33.935028843), x_dir=(-1, 0, 0), z_dir=(0, 0, -1)).offset(-BOSS_EXTRU_43_DEPTH_BACK)):
        with BuildLine():
            Line((0, 275.000000001), (0, 273.000000001))
            ThreePointArc((0, 273.000000001), (-0.585786438, 271.585786439), (-2, 271.000000001))
            Line((-2, 271.000000001), (-7, 271.000000001))
            Line((-7, 271.000000001), (-7, 277.000000001))
            Line((-7, 277.000000001), (-2, 277.000000001))
            ThreePointArc((-2, 277.000000001), (-0.585786438, 276.414213564), (0, 275.000000001))
        make_face()
        with Locations(Location((-3.5, 274.000000001, 0), (0, 0, 180))):
            Circle(ESQUISSE53_R, mode=Mode.SUBTRACT)
    # profile 2 of 4: a face of its own
    with BuildSketch(Plane(origin=(0, 0, 33.935028843), x_dir=(-1, 0, 0), z_dir=(0, 0, -1)).offset(-BOSS_EXTRU_43_DEPTH_BACK)):
        with BuildLine():
            Line((-28, 222.289321881), (-28, 216.289321881))
            Line((-28, 216.289321881), (-33, 216.289321881))
            ThreePointArc((-33, 216.289321881), (-34.414213562, 216.875108319), (-35, 218.289321881))
            Line((-35, 218.289321881), (-35, 220.289321881))
            ThreePointArc((-35, 220.289321881), (-34.414213562, 221.703535444), (-33, 222.289321881))
            Line((-33, 222.289321881), (-28, 222.289321881))
        make_face()
        with Locations((-31.5, 219.289321881)):
            Circle(ESQUISSE53_R, mode=Mode.SUBTRACT)
    # profile 3 of 4: a face of its own
    with BuildSketch(Plane(origin=(0, 0, 33.935028843), x_dir=(-1, 0, 0), z_dir=(0, 0, -1)).offset(-BOSS_EXTRU_43_DEPTH_BACK)):
        with BuildLine():
            Line((-28, 277.000000001), (-28, 271.000000001))
            Line((-28, 271.000000001), (-33, 271.000000001))
            ThreePointArc((-33, 271.000000001), (-34.414213562, 271.585786439), (-35, 273.000000001))
            Line((-35, 273.000000001), (-35, 275.000000001))
            ThreePointArc((-35, 275.000000001), (-34.414213562, 276.414213564), (-33, 277.000000001))
            Line((-33, 277.000000001), (-28, 277.000000001))
        make_face()
        with Locations((-31.5, 274.000000001)):
            Circle(ESQUISSE53_R, mode=Mode.SUBTRACT)
    # profile 4 of 4: a face of its own
    with BuildSketch(Plane(origin=(0, 0, 33.935028843), x_dir=(-1, 0, 0), z_dir=(0, 0, -1)).offset(-BOSS_EXTRU_43_DEPTH_BACK)):
        with BuildLine():
            Line((0, 220.289321881), (0, 218.289321881))
            ThreePointArc((0, 218.289321881), (-0.585786438, 216.875108319), (-2, 216.289321881))
            Line((-2, 216.289321881), (-7, 216.289321881))
            Line((-7, 216.289321881), (-7, 222.289321881))
            Line((-7, 222.289321881), (-2, 222.289321881))
            ThreePointArc((-2, 222.289321881), (-0.585786438, 221.703535444), (0, 220.289321881))
        make_face()
        with Locations(Location((-3.5, 219.289321881, 0), (0, 0, 180))):
            Circle(ESQUISSE53_R, mode=Mode.SUBTRACT)
    extrude(amount=BOSS_EXTRU_43_DEPTH + BOSS_EXTRU_43_DEPTH_BACK)

    # Esquisse54 → Enlèv. mat.-Extru.15 (cut)
    with BuildSketch(Plane(origin=(0, 0, 33.935028843), x_dir=(-1, 0, 0), z_dir=(0, 0, -1)).offset(ENL_V_START)):
        with Locations((-31.5, 274.000000001)):
            Circle(ESQUISSE54_R)
        with Locations(Location((-3.5, 274.000000001, 0), (0, 0, 180))):
            Circle(ESQUISSE54_R)
        with Locations((-31.5, 219.289321881)):
            Circle(ESQUISSE54_R)
        with Locations(Location((-3.5, 219.289321881, 0), (0, 0, 180))):
            Circle(ESQUISSE54_R)
    extrude(amount=ENL_V_MAT_EXTRU_15_DEPTH, mode=Mode.SUBTRACT)

    # Esquisse55 → Boss.-Extru.44 (add, two sides: drawn at the far end of the back side and taken through both)
    # profile 1 of 2: a face of its own
    with BuildSketch(Plane(origin=(0, 0, 33.935028843), x_dir=(-1, 0, 0), z_dir=(0, 0, -1)).offset(-BOSS_EXTRU_44_DEPTH_BACK)):
        with BuildLine():
            Line((0, 207.789321881), (0, 205.789321881))
            Line((0, 205.789321881), (0, 201.789321881))
            Line((0, 201.789321881), (0, 199.789321881))
            Line((0, 199.789321881), (0, 195.789321881))
            Line((0, 195.789321881), (0, 193.789321881))
            ThreePointArc((0, 193.789321881), (-0.585786438, 192.375108319), (-2, 191.789321881))
            Line((-2, 191.789321881), (-7, 191.789321881))
            Line((-7, 191.789321881), (-7, 197.789321881))
            Line((-7, 197.789321881), (-7, 203.789321881))
            Line((-7, 203.789321881), (-7, 209.789321881))
            Line((-7, 209.789321881), (-2, 209.789321881))
            ThreePointArc((-2, 209.789321881), (-0.585786438, 209.203535444), (0, 207.789321881))
        make_face()
        with Locations((-3.5, 206.789321881)):
            Circle(ESQUISSE55_R, mode=Mode.SUBTRACT)
        with Locations((-3.5, 194.789321881)):
            Circle(ESQUISSE55_R, mode=Mode.SUBTRACT)
        with Locations((-3.5, 200.789321881)):
            Circle(ESQUISSE55_R, mode=Mode.SUBTRACT)
    # profile 2 of 2: a face of its own
    with BuildSketch(Plane(origin=(0, 0, 33.935028843), x_dir=(-1, 0, 0), z_dir=(0, 0, -1)).offset(-BOSS_EXTRU_44_DEPTH_BACK)):
        with BuildLine():
            Line((-35, 195.789321881), (-35, 193.789321881))
            ThreePointArc((-35, 193.789321881), (-34.414213562, 192.375108319), (-33, 191.789321881))
            Line((-33, 191.789321881), (-28, 191.789321881))
            Line((-28, 191.789321881), (-28, 197.789321881))
            Line((-28, 197.789321881), (-28, 203.789321881))
            Line((-28, 203.789321881), (-28, 209.789321881))
            Line((-28, 209.789321881), (-33, 209.789321881))
            ThreePointArc((-33, 209.789321881), (-34.414213562, 209.203535444), (-35, 207.789321881))
            Line((-35, 207.789321881), (-35, 205.789321881))
            Line((-35, 205.789321881), (-35, 201.789321881))
            Line((-35, 201.789321881), (-35, 199.789321881))
            Line((-35, 199.789321881), (-35, 195.789321881))
        make_face()
        with Locations((-31.5, 194.789321881)):
            Circle(ESQUISSE55_R, mode=Mode.SUBTRACT)
        with Locations((-31.5, 206.789321881)):
            Circle(ESQUISSE55_R, mode=Mode.SUBTRACT)
        with Locations((-31.5, 200.789321881)):
            Circle(ESQUISSE55_R, mode=Mode.SUBTRACT)
    extrude(amount=BOSS_EXTRU_44_DEPTH + BOSS_EXTRU_44_DEPTH_BACK)

    # Esquisse58 → Enlèv. mat.-Extru.18 (cut)
    with BuildSketch(Plane(origin=(0, 282, 0), x_dir=(1, 0, 0), z_dir=(0, 1, 0))):
        Polygon((-62.5, -33.935028843), (-78.6806035, 56.359307264), (170.777216178, 50.921534628), (97.5, -33.935028843), align=None)
    extrude(amount=-ENL_V_MAT_EXTRU_18_DEPTH, mode=Mode.SUBTRACT)

    # Esquisse59 → Enlèv. mat.-Extru.19 (cut)
    with BuildSketch(Plane(origin=(0, 0, 33.935028843), x_dir=(-1, 0, 0), z_dir=(0, 0, -1))):
        Polygon((14.773980237, 211.289321881), (14.773980237, 177.707540822), (-45.784477836, 177.707540822), (-45.784477836, 212.312374007), align=None)
    extrude(amount=-ENL_V_MAT_EXTRU_19_DEPTH, mode=Mode.SUBTRACT)

    # Esquisse62 → Boss.-Extru.45 (add)
    with BuildSketch(Plane(origin=(97.5, 0, 0), x_dir=(0, 0, -1), z_dir=(1, 0, 0))):
        Polygon((-114.645706961, 211.289321881), (-106.645706961, 211.289321881), (-106.645706961, 212.663665847), (-113.271362995, 212.663665847), align=None)
        with Locations((-37.935028843, 211.976493864)):
            Rectangle(ESQUISSE62_W, ESQUISSE62_H)
    extrude(amount=-BOSS_EXTRU_45_DEPTH)


solid = part.part
